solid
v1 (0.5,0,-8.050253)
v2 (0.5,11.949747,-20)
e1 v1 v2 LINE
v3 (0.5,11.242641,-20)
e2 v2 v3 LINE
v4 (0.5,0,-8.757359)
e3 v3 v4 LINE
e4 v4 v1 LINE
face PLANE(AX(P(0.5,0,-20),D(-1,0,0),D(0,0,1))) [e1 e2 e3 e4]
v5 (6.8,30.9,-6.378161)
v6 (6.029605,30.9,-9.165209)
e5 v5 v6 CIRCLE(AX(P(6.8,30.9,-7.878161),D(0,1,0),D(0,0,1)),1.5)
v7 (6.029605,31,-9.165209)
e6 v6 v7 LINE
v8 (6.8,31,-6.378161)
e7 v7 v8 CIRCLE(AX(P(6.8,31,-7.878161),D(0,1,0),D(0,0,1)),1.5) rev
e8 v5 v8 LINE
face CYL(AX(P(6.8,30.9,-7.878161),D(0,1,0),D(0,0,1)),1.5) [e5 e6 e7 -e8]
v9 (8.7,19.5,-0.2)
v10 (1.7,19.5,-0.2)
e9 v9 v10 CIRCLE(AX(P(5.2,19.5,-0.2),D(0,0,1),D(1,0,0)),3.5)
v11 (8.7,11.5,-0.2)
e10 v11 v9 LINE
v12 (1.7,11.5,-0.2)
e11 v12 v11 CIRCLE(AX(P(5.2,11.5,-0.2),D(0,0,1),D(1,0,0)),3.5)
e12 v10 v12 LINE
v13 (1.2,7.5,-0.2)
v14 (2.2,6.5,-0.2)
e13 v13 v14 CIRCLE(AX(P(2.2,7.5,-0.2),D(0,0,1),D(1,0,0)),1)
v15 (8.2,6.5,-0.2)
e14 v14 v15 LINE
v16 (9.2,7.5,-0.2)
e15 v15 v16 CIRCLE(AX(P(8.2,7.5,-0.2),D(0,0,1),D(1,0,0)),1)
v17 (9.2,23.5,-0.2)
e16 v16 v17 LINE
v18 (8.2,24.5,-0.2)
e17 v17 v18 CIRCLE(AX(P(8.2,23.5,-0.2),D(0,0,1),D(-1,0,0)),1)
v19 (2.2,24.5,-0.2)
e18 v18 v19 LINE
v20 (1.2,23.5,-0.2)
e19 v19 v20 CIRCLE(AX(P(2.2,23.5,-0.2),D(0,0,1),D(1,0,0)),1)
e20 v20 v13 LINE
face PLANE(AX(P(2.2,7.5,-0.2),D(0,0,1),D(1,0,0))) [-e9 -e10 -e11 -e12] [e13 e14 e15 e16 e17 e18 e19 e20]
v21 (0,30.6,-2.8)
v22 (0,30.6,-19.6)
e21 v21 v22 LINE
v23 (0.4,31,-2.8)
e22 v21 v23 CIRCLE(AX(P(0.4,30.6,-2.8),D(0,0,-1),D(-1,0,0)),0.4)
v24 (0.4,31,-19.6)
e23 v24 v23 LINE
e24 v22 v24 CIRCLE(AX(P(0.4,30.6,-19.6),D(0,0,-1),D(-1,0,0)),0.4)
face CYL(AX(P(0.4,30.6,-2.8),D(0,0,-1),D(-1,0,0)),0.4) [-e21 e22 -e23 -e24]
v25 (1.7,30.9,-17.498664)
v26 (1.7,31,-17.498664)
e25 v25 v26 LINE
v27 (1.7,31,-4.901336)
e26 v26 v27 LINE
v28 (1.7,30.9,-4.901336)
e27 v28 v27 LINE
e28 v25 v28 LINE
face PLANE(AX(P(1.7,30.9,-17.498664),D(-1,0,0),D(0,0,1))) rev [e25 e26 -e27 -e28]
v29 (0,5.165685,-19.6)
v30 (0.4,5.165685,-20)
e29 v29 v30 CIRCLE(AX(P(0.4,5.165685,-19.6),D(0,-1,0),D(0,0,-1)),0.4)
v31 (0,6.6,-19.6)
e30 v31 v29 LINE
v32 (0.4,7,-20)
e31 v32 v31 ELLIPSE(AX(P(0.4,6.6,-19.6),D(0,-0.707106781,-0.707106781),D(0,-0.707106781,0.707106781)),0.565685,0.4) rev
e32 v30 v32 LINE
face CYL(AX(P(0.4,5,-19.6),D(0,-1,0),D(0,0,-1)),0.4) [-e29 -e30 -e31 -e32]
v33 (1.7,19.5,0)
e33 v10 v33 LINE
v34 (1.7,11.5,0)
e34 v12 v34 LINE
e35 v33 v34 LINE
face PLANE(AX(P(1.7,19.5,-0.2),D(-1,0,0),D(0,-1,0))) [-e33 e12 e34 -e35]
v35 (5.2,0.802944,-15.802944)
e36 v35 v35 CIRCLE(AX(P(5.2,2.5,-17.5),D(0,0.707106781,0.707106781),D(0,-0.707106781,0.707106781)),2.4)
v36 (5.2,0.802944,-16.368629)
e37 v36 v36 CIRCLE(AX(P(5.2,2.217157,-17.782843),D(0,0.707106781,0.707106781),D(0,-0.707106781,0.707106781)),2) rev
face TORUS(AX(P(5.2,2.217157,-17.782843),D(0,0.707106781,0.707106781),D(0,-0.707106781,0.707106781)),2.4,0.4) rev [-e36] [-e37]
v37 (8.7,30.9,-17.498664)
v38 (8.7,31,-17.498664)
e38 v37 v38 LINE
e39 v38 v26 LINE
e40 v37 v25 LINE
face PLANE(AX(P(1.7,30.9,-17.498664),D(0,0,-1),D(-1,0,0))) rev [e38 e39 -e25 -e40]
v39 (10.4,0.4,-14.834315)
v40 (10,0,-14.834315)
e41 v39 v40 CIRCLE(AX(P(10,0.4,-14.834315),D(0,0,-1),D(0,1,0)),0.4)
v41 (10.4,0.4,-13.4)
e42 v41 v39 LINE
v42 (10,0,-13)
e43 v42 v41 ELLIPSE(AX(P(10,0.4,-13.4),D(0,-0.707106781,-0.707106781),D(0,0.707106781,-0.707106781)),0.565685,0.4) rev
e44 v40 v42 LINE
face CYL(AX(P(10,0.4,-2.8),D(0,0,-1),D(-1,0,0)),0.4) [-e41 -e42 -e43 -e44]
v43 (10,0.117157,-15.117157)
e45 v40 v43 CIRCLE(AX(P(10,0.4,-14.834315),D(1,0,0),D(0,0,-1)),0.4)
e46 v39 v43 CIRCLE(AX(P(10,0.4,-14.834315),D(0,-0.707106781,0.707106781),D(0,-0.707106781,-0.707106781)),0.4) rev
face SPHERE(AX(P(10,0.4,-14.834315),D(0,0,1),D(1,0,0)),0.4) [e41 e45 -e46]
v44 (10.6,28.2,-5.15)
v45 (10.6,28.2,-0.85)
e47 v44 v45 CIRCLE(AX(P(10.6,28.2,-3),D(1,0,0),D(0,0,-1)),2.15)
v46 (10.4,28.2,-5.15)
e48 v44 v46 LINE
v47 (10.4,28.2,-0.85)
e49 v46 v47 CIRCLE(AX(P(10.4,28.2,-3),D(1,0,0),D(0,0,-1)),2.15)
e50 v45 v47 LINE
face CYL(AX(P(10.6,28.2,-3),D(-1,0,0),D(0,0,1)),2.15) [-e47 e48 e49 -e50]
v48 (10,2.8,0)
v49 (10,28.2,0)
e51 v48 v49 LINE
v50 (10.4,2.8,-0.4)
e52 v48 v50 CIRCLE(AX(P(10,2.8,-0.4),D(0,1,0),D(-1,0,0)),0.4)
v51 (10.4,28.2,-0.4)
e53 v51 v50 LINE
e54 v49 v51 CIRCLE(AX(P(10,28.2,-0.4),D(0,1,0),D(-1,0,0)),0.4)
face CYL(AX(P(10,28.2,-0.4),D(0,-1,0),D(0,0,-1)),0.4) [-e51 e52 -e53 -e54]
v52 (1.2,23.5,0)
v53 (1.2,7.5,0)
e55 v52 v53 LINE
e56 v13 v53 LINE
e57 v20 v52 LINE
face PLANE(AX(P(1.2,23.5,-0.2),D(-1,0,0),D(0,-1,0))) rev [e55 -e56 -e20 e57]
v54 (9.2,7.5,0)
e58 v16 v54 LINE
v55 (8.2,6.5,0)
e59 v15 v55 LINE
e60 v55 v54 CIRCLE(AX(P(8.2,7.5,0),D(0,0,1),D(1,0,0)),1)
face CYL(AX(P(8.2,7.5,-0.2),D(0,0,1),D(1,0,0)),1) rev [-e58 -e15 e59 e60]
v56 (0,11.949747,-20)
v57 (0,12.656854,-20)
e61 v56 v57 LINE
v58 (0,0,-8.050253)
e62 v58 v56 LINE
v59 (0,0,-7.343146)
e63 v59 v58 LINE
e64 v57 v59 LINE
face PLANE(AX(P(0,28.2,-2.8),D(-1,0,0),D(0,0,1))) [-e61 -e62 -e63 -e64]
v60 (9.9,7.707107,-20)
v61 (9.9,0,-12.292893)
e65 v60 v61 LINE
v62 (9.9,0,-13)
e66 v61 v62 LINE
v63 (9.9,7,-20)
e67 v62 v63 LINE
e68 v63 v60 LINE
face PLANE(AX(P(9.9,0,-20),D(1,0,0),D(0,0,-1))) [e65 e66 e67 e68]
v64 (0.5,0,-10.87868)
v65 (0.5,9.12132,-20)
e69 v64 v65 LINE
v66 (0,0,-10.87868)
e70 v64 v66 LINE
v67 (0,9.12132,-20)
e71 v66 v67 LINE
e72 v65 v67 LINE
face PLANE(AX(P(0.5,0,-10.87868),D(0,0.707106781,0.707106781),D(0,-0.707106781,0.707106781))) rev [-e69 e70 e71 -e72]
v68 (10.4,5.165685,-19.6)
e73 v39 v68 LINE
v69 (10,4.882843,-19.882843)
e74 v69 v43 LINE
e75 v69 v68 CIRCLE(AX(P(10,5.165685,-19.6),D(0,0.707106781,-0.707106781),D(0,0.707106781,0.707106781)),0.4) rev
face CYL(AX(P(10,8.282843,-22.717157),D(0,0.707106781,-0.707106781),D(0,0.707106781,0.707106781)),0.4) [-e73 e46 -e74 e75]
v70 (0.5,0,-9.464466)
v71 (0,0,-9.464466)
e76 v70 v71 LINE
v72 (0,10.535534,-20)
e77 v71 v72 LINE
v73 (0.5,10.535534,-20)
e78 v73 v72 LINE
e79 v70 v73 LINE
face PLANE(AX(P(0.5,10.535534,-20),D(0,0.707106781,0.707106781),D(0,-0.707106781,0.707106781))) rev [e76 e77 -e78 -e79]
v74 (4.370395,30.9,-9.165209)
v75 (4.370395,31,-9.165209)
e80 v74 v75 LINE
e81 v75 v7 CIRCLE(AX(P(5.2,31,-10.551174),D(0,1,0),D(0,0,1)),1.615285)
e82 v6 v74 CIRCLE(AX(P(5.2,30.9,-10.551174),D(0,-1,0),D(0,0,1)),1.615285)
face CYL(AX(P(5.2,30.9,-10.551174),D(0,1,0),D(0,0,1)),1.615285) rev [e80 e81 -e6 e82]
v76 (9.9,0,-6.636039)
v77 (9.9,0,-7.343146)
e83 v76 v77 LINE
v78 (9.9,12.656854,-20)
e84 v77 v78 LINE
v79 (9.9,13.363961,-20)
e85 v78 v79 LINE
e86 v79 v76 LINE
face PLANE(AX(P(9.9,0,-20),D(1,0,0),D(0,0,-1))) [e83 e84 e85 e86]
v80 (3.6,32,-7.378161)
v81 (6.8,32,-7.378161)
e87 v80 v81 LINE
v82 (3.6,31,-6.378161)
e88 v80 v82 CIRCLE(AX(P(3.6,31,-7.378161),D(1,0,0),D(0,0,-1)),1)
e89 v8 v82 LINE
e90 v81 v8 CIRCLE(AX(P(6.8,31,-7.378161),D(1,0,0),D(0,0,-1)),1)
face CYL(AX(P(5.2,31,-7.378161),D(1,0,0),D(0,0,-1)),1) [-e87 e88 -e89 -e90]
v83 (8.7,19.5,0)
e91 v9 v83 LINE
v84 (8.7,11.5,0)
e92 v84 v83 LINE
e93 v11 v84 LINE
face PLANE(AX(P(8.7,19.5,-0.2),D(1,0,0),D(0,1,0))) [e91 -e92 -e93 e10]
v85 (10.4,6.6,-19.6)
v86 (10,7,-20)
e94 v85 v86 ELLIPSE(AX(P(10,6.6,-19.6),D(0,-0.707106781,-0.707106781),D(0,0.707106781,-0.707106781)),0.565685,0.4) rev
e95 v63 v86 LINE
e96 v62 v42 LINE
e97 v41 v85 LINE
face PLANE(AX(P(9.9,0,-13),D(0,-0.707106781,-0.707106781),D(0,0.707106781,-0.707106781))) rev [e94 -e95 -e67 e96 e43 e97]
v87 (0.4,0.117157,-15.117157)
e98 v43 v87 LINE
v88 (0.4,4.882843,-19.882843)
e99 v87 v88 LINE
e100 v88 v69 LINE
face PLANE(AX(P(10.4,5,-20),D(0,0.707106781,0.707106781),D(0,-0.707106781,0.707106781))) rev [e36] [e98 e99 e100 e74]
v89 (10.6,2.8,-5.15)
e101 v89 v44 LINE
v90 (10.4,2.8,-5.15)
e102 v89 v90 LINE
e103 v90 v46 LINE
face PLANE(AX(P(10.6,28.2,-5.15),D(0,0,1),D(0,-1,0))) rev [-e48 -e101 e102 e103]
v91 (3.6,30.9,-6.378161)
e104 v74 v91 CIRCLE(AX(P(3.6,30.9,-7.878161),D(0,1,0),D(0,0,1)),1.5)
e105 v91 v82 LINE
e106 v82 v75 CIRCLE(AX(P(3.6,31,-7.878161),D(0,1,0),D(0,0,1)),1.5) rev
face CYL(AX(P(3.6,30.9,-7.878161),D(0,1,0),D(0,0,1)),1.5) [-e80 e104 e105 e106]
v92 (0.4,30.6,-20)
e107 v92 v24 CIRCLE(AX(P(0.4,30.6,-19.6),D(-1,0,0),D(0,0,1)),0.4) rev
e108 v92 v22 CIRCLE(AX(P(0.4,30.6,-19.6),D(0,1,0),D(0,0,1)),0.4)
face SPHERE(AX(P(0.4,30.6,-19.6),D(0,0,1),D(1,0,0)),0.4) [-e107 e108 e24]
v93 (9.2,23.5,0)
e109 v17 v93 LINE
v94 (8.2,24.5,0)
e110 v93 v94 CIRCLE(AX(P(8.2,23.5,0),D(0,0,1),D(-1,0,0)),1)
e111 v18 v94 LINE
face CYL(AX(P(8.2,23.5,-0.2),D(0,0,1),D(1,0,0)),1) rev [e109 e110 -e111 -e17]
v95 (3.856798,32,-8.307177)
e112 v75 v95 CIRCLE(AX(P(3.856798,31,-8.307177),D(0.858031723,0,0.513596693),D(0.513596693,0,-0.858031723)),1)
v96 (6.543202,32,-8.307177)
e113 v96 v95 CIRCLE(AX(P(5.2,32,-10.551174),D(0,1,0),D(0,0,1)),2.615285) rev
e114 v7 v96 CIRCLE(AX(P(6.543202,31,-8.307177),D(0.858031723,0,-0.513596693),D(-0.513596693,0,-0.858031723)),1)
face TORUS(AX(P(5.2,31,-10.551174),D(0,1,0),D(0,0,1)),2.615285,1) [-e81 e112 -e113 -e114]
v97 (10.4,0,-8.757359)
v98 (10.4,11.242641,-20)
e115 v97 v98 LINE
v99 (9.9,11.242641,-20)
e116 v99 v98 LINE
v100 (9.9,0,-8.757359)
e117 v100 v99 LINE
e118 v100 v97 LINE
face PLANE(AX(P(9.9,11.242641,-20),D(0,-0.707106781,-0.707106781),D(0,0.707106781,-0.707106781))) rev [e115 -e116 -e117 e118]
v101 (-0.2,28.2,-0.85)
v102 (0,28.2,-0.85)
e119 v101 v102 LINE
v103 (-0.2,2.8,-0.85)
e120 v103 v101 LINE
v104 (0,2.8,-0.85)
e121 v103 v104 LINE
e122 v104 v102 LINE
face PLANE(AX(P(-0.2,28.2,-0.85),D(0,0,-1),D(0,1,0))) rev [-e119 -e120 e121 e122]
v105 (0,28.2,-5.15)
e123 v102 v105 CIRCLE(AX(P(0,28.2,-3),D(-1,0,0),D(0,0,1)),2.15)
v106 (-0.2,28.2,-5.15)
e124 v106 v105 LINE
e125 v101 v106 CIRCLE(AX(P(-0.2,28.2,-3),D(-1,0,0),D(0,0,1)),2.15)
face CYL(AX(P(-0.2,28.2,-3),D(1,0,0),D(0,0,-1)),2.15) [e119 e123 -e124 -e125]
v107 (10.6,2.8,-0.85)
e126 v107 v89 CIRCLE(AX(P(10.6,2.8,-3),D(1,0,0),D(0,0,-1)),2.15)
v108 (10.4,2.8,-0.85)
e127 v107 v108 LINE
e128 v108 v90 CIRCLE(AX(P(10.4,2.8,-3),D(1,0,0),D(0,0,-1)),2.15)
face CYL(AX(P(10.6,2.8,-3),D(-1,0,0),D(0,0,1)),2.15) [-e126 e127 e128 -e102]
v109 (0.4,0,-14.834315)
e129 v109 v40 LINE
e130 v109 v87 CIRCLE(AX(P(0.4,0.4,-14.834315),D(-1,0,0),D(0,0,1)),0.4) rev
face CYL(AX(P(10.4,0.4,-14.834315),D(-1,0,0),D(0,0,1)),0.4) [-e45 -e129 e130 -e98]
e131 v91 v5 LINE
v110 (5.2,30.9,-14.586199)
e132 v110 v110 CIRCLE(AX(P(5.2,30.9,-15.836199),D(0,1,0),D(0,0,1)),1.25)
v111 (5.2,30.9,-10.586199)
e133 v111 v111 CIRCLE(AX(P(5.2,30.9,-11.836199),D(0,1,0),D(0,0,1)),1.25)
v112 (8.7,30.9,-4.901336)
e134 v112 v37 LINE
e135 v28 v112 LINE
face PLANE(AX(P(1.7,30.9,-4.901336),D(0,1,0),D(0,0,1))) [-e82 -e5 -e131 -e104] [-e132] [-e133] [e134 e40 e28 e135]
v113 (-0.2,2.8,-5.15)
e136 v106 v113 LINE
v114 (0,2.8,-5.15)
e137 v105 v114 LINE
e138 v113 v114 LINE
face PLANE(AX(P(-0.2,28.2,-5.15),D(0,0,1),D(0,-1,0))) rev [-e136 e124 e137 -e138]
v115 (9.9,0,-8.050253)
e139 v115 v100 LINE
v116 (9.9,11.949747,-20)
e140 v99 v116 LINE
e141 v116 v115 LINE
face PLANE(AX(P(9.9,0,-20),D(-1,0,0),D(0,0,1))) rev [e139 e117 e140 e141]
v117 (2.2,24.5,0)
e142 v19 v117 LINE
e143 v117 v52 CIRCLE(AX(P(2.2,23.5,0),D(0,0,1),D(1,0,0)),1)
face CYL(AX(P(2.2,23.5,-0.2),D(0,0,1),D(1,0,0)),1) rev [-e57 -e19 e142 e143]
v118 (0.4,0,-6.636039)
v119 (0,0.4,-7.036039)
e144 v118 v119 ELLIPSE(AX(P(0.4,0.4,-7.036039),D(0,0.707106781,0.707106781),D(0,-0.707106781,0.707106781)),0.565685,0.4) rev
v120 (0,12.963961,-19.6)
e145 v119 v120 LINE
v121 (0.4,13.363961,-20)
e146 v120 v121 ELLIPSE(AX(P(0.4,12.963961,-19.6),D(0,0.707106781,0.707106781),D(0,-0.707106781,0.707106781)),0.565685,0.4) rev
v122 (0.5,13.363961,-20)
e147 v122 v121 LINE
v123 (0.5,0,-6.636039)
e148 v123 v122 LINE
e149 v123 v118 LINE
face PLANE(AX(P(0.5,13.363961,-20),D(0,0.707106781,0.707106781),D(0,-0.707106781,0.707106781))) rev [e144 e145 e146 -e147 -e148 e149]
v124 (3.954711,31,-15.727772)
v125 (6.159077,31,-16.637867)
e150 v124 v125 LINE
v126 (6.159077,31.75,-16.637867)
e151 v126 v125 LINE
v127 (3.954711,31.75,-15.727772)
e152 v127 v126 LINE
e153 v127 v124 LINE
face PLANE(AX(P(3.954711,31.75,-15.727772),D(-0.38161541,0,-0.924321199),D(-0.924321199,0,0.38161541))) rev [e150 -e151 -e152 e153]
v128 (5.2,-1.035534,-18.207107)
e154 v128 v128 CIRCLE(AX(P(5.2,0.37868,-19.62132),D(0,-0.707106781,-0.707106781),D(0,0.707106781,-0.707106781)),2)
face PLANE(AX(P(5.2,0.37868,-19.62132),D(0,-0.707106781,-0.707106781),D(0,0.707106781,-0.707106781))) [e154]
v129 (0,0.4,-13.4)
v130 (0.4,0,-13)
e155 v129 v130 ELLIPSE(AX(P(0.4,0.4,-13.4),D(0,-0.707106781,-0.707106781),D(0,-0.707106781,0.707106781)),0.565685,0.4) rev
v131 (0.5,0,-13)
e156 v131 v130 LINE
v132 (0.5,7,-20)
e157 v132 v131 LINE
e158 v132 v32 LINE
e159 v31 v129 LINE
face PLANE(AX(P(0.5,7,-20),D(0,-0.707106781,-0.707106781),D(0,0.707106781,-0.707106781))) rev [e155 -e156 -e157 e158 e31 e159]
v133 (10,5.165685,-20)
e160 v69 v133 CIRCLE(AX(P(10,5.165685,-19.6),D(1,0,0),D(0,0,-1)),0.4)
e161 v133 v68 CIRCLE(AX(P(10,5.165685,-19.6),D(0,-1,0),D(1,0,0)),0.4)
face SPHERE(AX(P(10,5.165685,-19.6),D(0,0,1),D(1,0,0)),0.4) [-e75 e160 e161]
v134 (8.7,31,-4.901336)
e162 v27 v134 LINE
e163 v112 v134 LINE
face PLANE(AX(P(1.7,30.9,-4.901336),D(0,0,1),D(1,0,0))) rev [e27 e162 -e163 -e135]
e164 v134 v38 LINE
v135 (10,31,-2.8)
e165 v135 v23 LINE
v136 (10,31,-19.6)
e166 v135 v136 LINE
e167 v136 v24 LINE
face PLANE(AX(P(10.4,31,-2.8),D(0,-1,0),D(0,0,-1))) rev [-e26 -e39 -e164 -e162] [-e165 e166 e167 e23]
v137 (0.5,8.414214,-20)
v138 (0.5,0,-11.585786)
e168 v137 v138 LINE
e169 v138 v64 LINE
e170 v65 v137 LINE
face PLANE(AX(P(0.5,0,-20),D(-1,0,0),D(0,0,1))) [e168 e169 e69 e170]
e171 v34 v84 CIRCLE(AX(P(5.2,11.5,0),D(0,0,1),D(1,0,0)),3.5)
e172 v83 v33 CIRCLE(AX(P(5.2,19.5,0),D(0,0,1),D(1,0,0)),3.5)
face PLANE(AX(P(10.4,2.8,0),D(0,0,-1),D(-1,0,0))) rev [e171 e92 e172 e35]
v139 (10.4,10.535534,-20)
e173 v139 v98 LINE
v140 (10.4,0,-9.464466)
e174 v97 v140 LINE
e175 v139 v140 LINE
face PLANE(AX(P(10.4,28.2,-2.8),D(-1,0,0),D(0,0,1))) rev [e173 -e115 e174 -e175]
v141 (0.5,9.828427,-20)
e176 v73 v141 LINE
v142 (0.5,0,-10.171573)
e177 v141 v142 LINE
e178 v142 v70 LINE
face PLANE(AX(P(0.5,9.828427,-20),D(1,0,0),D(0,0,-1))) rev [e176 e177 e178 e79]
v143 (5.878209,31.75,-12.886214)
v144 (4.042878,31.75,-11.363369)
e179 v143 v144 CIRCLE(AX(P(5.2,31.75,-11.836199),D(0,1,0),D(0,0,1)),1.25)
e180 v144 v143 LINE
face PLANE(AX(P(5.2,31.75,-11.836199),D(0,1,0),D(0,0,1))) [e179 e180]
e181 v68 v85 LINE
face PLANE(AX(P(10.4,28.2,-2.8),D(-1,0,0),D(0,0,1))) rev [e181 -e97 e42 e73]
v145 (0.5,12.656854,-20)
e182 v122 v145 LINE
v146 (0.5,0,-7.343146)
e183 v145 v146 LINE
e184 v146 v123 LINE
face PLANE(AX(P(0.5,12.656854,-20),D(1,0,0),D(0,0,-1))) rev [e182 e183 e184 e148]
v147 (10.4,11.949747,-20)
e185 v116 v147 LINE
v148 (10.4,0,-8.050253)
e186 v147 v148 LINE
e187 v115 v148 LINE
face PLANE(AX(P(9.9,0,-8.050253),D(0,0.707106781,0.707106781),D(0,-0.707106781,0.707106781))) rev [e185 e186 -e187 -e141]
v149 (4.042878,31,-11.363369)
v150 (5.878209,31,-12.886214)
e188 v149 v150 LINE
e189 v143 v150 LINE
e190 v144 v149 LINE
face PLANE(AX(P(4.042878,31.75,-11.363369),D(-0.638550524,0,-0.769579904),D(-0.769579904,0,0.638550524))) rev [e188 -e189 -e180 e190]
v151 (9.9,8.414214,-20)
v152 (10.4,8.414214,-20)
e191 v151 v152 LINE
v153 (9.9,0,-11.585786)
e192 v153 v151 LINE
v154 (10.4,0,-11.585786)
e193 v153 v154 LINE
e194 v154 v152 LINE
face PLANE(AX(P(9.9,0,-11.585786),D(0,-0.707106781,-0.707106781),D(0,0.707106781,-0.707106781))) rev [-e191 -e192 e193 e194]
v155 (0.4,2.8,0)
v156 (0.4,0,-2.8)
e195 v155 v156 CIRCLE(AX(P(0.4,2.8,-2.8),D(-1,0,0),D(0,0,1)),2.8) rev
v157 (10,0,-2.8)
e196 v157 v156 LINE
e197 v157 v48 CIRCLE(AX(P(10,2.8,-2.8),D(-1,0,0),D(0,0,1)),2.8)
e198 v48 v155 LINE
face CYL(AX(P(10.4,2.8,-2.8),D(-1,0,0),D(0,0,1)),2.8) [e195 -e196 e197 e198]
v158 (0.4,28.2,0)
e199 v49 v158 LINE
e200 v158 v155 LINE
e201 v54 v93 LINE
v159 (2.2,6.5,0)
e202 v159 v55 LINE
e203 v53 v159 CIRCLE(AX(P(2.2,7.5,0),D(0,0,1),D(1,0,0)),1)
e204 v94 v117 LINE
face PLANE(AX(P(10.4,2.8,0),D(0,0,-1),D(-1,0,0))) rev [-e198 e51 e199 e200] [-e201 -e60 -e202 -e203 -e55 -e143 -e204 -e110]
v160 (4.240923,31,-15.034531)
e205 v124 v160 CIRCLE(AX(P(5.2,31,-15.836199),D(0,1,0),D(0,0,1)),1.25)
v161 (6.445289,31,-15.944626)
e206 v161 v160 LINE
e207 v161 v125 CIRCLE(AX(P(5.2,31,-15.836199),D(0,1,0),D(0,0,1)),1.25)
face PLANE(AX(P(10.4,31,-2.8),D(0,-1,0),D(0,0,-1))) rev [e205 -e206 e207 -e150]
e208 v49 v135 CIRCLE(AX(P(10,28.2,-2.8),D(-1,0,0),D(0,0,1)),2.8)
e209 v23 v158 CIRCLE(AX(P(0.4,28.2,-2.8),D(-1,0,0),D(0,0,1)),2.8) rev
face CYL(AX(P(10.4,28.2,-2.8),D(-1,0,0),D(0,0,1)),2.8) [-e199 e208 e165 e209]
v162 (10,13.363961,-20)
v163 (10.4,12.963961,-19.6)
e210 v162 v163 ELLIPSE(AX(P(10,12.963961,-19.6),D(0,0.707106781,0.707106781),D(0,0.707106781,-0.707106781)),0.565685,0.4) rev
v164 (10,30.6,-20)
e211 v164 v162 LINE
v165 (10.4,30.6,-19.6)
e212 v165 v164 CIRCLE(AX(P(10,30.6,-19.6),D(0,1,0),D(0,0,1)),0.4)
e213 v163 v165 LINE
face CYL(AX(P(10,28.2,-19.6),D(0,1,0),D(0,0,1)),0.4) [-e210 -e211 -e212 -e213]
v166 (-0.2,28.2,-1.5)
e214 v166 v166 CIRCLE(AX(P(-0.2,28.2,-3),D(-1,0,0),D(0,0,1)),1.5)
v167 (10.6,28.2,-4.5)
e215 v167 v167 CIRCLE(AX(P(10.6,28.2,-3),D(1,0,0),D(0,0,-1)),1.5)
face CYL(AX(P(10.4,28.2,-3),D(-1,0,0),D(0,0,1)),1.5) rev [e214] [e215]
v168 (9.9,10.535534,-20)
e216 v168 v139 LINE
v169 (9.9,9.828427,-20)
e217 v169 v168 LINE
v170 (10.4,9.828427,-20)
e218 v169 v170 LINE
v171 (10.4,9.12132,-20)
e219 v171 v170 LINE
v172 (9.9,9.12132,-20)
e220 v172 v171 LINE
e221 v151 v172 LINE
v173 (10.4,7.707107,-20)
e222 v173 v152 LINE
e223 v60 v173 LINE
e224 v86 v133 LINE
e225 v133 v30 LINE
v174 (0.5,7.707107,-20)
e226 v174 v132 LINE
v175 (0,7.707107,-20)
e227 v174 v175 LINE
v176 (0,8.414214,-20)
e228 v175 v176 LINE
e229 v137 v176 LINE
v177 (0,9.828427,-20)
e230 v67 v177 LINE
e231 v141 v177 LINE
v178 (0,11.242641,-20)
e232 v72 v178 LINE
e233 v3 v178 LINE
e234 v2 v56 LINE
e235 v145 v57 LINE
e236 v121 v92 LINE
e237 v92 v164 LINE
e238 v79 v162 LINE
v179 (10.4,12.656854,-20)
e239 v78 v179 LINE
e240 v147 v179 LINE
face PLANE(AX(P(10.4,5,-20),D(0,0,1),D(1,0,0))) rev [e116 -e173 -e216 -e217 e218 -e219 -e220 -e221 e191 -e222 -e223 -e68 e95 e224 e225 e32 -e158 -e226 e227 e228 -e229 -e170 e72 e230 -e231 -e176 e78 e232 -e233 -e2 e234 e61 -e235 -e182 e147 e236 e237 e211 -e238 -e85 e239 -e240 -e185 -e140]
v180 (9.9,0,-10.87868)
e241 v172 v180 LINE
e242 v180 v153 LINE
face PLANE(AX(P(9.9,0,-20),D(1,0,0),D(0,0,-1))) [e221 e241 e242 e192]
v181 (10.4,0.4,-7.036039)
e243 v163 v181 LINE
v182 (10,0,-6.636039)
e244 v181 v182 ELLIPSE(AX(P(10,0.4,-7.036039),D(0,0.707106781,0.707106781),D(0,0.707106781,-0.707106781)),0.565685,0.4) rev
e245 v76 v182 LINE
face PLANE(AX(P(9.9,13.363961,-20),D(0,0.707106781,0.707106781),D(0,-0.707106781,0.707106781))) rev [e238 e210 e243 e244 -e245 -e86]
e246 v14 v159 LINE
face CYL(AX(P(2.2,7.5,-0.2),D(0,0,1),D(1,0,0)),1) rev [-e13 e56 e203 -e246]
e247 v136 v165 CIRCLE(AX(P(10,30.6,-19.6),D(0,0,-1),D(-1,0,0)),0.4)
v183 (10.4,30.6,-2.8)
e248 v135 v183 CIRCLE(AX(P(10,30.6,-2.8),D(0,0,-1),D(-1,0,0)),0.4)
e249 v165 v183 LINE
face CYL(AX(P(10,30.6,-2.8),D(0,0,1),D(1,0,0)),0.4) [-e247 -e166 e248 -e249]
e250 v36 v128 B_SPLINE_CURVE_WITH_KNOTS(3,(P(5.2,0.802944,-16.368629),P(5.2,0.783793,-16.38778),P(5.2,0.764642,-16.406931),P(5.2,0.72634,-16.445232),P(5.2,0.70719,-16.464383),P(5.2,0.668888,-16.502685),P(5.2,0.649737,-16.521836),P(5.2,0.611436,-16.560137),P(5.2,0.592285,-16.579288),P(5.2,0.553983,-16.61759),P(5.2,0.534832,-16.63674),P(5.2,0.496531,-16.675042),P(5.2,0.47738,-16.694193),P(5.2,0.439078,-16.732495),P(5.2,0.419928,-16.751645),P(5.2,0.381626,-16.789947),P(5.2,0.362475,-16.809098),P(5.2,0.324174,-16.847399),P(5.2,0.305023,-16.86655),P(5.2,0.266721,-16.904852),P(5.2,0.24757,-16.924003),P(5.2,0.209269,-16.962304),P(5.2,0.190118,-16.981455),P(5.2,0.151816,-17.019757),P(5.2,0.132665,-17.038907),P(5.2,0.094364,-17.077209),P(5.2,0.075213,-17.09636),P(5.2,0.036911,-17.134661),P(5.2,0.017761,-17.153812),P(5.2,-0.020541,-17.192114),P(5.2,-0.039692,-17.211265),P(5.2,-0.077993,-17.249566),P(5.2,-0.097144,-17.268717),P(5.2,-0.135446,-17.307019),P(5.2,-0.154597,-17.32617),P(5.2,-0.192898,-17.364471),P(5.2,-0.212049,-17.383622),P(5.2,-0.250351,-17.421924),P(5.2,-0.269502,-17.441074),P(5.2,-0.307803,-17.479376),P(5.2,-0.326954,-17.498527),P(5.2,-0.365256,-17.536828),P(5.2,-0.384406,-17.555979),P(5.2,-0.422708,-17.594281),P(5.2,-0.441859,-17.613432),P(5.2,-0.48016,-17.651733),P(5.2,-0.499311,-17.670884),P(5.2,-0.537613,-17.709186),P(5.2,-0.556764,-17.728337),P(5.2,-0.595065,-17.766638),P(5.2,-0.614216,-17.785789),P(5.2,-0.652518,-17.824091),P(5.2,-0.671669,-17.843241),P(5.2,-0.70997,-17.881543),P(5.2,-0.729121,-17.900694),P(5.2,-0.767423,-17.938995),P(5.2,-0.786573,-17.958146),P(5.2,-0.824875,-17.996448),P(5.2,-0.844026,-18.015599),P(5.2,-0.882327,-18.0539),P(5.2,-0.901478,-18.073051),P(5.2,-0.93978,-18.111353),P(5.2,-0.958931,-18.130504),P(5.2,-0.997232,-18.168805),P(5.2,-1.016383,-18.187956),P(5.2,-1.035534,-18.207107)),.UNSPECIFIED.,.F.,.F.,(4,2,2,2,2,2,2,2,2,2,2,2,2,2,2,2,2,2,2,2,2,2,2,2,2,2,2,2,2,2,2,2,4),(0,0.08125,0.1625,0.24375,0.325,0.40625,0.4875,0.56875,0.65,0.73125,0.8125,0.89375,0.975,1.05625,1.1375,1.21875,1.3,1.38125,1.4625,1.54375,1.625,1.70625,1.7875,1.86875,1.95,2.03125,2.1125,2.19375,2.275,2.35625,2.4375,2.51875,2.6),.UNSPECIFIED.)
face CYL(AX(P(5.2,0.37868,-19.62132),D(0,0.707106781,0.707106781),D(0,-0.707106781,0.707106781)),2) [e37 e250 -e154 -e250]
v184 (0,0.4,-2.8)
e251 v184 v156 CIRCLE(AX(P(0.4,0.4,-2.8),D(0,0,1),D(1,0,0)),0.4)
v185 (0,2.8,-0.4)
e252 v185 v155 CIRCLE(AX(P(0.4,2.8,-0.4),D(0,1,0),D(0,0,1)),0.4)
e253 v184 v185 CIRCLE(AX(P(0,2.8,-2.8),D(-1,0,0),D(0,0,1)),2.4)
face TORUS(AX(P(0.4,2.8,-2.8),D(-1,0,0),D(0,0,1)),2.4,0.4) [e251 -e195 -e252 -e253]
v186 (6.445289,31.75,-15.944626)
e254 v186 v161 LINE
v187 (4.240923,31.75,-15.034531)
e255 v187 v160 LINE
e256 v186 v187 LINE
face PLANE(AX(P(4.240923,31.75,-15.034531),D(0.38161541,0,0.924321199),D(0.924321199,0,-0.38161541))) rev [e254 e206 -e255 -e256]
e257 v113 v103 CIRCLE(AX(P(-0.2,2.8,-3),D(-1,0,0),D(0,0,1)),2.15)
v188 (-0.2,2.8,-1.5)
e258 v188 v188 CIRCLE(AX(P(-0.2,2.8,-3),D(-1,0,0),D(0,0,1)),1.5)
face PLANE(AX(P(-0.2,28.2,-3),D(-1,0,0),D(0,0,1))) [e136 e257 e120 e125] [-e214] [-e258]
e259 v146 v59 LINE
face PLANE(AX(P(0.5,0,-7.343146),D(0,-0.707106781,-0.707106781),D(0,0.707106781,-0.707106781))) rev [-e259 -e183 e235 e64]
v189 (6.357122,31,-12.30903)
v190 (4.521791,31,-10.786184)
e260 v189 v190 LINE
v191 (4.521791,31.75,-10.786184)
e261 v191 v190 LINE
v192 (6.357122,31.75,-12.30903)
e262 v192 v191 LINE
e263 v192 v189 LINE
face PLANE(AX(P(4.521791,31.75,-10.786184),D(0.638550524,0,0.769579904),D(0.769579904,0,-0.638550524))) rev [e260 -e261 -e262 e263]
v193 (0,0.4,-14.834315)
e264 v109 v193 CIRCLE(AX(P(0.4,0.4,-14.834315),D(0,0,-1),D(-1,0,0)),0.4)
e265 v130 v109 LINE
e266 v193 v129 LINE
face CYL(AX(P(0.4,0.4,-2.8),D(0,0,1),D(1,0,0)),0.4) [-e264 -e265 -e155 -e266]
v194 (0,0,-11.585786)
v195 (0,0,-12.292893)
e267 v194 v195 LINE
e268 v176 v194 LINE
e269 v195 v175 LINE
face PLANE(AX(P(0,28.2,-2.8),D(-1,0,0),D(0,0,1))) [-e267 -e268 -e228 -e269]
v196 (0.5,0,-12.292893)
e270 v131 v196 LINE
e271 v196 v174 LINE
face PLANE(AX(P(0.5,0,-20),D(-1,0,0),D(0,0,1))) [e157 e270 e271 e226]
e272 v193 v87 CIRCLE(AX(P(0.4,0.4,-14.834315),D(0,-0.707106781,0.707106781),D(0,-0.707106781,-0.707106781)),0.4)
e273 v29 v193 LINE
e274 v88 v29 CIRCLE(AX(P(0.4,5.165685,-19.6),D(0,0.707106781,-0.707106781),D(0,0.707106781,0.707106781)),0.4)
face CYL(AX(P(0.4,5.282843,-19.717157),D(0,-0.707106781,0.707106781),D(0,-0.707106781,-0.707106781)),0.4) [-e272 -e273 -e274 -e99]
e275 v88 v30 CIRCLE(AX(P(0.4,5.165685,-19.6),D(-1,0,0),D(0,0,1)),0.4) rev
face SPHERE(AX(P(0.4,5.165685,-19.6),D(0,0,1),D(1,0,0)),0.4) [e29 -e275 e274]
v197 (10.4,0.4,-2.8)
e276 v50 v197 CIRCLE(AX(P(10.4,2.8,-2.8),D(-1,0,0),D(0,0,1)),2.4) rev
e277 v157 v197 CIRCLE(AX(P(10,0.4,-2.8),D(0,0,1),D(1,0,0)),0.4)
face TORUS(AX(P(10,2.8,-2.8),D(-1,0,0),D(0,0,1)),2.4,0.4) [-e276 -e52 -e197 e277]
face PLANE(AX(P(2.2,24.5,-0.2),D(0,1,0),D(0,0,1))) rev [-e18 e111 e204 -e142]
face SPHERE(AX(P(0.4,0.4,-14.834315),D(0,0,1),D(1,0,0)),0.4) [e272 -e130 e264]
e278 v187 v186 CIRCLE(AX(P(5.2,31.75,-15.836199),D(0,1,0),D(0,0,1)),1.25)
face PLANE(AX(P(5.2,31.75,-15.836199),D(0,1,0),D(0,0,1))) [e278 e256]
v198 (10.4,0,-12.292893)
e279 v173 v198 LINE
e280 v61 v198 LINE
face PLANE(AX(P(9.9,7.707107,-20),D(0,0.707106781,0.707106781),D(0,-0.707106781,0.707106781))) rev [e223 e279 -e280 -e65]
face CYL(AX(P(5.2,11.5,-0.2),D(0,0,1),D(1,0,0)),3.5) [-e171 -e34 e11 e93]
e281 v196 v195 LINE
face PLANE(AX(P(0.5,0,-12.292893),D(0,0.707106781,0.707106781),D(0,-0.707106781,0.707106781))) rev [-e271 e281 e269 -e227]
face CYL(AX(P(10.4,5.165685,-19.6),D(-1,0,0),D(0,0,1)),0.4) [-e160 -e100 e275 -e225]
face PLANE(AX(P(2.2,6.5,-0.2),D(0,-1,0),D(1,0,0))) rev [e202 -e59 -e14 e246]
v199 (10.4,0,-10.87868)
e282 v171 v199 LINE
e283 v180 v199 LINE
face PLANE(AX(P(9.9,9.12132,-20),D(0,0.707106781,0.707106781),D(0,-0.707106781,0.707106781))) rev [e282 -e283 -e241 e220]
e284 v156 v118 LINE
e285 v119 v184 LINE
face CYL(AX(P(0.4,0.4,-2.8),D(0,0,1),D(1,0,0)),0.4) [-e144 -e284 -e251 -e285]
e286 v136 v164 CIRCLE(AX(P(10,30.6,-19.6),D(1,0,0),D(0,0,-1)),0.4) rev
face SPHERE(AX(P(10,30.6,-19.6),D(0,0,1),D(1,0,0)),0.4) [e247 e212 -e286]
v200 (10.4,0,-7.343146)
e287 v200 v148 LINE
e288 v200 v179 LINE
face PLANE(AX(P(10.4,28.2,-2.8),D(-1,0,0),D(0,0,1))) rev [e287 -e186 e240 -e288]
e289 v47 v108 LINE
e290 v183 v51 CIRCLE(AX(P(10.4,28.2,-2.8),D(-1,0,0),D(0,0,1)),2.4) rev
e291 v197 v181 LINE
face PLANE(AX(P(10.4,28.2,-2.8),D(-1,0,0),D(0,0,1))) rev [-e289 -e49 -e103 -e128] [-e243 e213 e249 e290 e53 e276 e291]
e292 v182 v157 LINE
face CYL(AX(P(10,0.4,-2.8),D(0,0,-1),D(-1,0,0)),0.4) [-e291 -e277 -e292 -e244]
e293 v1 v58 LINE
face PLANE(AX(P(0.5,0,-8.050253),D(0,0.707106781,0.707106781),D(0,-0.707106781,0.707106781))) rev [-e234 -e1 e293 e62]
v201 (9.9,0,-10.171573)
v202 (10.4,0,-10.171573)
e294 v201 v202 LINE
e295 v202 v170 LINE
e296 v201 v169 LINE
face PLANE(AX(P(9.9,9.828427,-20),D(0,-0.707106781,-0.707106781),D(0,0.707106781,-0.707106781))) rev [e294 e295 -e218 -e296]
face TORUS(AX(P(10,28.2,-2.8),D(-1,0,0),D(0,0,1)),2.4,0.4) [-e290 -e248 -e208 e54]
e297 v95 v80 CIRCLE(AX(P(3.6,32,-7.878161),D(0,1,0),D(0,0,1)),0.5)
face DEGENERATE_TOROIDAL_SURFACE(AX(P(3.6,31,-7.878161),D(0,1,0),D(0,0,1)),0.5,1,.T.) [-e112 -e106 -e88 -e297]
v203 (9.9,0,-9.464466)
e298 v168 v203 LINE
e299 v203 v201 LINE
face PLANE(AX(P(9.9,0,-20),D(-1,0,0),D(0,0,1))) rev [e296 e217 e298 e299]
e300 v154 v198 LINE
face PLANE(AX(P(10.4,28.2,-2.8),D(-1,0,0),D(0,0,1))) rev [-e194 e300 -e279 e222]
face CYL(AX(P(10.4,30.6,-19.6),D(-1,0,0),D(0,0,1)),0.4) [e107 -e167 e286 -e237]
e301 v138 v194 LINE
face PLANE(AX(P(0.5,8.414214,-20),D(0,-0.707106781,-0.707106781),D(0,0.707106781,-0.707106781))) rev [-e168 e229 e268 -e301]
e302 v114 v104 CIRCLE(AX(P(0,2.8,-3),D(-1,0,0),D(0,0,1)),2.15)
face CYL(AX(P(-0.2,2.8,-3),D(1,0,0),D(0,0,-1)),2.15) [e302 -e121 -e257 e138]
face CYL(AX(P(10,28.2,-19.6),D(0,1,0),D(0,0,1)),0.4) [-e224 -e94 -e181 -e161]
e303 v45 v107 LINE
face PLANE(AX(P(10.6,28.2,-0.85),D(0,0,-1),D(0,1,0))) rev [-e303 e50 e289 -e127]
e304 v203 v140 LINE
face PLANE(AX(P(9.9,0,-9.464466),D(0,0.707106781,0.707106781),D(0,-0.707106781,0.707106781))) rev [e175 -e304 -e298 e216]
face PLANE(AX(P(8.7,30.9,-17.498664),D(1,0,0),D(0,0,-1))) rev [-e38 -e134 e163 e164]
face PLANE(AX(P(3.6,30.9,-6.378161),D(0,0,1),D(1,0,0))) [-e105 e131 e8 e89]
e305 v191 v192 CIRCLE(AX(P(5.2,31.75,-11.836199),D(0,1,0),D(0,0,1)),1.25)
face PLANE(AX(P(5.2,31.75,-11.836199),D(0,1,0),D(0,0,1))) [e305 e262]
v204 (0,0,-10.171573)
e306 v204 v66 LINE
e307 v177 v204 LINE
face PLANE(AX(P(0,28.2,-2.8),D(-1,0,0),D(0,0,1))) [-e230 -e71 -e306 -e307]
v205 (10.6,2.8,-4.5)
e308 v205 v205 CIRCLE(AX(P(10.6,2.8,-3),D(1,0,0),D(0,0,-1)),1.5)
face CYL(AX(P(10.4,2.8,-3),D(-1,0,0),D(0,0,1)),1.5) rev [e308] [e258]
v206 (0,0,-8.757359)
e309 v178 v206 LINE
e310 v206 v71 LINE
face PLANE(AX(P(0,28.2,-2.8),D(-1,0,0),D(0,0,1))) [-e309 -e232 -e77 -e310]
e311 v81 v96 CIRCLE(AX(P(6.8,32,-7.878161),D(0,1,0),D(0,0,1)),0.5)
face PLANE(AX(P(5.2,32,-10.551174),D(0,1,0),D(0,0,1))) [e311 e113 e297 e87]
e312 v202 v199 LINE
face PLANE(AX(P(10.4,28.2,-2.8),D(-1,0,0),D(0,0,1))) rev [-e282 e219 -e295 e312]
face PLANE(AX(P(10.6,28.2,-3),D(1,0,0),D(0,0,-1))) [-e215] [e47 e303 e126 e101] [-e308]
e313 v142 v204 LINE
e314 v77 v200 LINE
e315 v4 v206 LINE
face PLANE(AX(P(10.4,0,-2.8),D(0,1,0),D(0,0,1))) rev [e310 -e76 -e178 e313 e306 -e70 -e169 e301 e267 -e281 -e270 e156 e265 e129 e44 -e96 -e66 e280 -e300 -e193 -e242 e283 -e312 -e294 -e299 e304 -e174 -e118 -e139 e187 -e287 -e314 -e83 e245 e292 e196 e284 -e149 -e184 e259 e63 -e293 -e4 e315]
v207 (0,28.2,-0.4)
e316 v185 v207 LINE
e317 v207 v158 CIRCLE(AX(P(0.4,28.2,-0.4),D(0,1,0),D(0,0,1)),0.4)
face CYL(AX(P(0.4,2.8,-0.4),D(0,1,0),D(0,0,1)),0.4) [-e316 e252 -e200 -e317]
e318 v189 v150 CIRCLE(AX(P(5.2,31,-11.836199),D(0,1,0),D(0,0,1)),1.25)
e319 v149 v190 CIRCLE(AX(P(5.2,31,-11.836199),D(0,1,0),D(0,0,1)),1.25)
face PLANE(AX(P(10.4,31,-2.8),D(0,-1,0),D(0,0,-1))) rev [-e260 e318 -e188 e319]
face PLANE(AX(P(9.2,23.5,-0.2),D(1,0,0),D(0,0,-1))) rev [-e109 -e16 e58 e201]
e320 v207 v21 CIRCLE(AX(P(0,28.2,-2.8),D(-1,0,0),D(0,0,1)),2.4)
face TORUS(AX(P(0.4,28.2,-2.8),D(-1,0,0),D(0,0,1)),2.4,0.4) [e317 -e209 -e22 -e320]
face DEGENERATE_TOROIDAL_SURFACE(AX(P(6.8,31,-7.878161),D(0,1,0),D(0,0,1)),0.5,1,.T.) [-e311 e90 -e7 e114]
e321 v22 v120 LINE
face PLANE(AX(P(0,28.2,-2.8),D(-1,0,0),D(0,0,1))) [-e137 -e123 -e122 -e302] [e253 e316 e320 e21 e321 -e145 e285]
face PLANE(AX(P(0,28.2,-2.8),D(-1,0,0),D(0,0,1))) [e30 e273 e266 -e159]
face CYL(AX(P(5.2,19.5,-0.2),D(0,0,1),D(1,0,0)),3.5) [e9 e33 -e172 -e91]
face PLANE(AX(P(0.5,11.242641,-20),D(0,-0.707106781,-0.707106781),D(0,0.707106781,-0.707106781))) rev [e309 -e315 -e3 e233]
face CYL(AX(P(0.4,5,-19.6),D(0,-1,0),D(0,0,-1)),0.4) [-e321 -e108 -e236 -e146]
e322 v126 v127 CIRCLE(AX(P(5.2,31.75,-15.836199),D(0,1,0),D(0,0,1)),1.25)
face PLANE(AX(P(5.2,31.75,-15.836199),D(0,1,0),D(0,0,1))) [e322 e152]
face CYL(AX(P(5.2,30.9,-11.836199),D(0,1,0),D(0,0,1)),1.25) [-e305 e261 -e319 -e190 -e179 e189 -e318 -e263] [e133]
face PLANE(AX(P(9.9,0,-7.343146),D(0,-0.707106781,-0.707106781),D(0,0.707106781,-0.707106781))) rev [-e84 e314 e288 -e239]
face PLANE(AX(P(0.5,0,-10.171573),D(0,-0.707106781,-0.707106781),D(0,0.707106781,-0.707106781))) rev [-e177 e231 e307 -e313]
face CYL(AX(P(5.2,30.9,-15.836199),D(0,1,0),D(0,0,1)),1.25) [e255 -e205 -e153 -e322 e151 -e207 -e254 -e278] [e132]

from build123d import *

# Parameters (mm, degrees)
ESQUISSE1_R             = 1.5
BOSS_EXTRU_1_DEPTH      = 10.4
ESQUISSE2_R             = 1.5
BOSS_EXTRU_3_DEPTH      = 0.2
BOSS_EXTRU_4_START      = 0.2
ESQUISSE3_R             = 1.5
BOSS_EXTRU_4_DEPTH      = 0.2
ENL_V_MAT_EXTRU_1_DEPTH = 0.2
ENL_V_MAT_EXTRU_3_DEPTH = 0.5
ENL_V_MAT_EXTRU_4_DEPTH = 0.5
CONG_1_R                = 0.4
ESQUISSE8_R             = 2
BOSS_EXTRU_5_DEPTH      = 3
CONG_2_R                = 0.4
ESQUISSE9_W             = 7
ESQUISSE9_H             = 12.59732845
ESQUISSE9_R             = 1.25
ENL_V_MAT_EXTRU_5_DEPTH = 0.1
BOSS_EXTRU_6_START      = 0.75
BOSS_EXTRU_6_DEPTH      = 0.75
BOSS_EXTRU_7_START      = 1
BOSS_EXTRU_7_DEPTH      = 1
CONG_3_R                = 1


with BuildPart() as part:
    # Esquisse1 → Boss.-Extru.1 (new body)
    with BuildSketch(Plane(origin=(0, 0, 0), x_dir=(0, 0, -1), z_dir=(1, 0, 0))):
        with BuildLine():
            Line((2.8, 0), (15, 0))
            Line((15, 0), (20, 5))
            Line((20, 5), (20, 31))
            Line((20, 31), (2.8, 31))
            ThreePointArc((2.8, 31), (0.820101013, 30.179898987), (0, 28.2))
            Line((0, 28.2), (0, 2.8))
            ThreePointArc((0, 2.8), (0.820101013, 0.820101013), (2.8, 0))
        make_face()
        with Locations((3, 28.2)):
            Circle(ESQUISSE1_R, mode=Mode.SUBTRACT)
        with Locations((3, 2.8)):
            Circle(ESQUISSE1_R, mode=Mode.SUBTRACT)
    extrude(amount=BOSS_EXTRU_1_DEPTH)

    # Esquisse2 → Boss.-Extru.3 (add)
    with BuildSketch(Plane(origin=(10.4, 0, 0), x_dir=(0, 0, -1), z_dir=(1, 0, 0))):
        with BuildLine():
            Line((5.15, 28.2), (5.15, 2.8))
            ThreePointArc((5.15, 2.8), (3, 0.65), (0.85, 2.8))
            Line((0.85, 2.8), (0.85, 28.2))
            ThreePointArc((0.85, 28.2), (3, 30.35), (5.15, 28.2))
        make_face()
        with Locations((3, 28.2)):
            Circle(ESQUISSE2_R, mode=Mode.SUBTRACT)
        with Locations((3, 2.8)):
            Circle(ESQUISSE2_R, mode=Mode.SUBTRACT)
    extrude(amount=BOSS_EXTRU_3_DEPTH)

    # Esquisse3 → Boss.-Extru.4 (add)
    with BuildSketch(Plane.ZY.offset(BOSS_EXTRU_4_START)):
        with BuildLine():
            Line((-0.85, 28.2), (-0.85, 2.8))
            ThreePointArc((-0.85, 2.8), (-3, 0.65), (-5.15, 2.8))
            Line((-5.15, 2.8), (-5.15, 28.2))
            ThreePointArc((-5.15, 28.2), (-3, 30.35), (-0.85, 28.2))
        make_face()
        with Locations((-3, 2.8)):
            Circle(ESQUISSE3_R, mode=Mode.SUBTRACT)
        with Locations((-3, 28.2)):
            Circle(ESQUISSE3_R, mode=Mode.SUBTRACT)
    extrude(amount=-BOSS_EXTRU_4_DEPTH)

    # Esquisse4 → Enlèv. mat.-Extru.1 (cut)
    with BuildSketch(Plane.XY):
        with BuildLine():
            Line((2.2, 24.5), (8.2, 24.5))
            ThreePointArc((8.2, 24.5), (8.907106781, 24.207106781), (9.2, 23.5))
            Line((9.2, 23.5), (9.2, 7.5))
            ThreePointArc((9.2, 7.5), (8.907106781, 6.792893219), (8.2, 6.5))
            Line((8.2, 6.5), (2.2, 6.5))
            ThreePointArc((2.2, 6.5), (1.492893219, 6.792893219), (1.2, 7.5))
            Line((1.2, 7.5), (1.2, 23.5))
            ThreePointArc((1.2, 23.5), (1.492893219, 24.207106781), (2.2, 24.5))
        make_face()
        with BuildLine():
            Line((8.7, 19.5), (8.7, 11.5))
            ThreePointArc((8.7, 11.5), (5.2, 8), (1.7, 11.5))
            Line((1.7, 11.5), (1.7, 19.5))
            ThreePointArc((1.7, 19.5), (5.2, 23), (8.7, 19.5))
        make_face(mode=Mode.SUBTRACT)
    extrude(amount=-ENL_V_MAT_EXTRU_1_DEPTH, mode=Mode.SUBTRACT)

    # Esquisse5 → Enlèv. mat.-Extru.3 (cut)
    with BuildSketch(Plane(origin=(10.4, 0, 0), x_dir=(0, 0, -1), z_dir=(1, 0, 0))):
        Polygon((13, 0), (20, 7), (20, 7.707106781), (12.292893219, 0), align=None)
        Polygon((11.585786438, 0), (20, 8.414213562), (20, 9.121320344), (10.878679656, 0), align=None)
        Polygon((20, 9.828427125), (10.171572875, 0), (9.464466094, 0), (20, 10.535533906), align=None)
        Polygon((20, 11.242640687), (8.757359313, 0), (8.050252532, 0), (20, 11.949747468), align=None)
        Polygon((7.343145751, 0), (20, 12.656854249), (20, 13.363961031), (6.636038969, 0), align=None)
    extrude(amount=-ENL_V_MAT_EXTRU_3_DEPTH, mode=Mode.SUBTRACT)

    # Esquisse7 → Enlèv. mat.-Extru.4 (cut)
    with BuildSketch(Plane.ZY):
        Polygon((-20, 7), (-13, 0), (-12.292893219, 0), (-20, 7.707106781), align=None)
        Polygon((-20, 8.414213562), (-11.585786438, 0), (-10.878679656, 0), (-20, 9.121320344), align=None)
        Polygon((-20, 9.828427125), (-20, 10.535533906), (-9.464466094, 0), (-10.171572875, 0), align=None)
        Polygon((-20, 11.242640687), (-8.757359313, 0), (-8.050252532, 0), (-20, 11.949747468), align=None)
        Polygon((-20, 12.656854249), (-20, 13.363961031), (-6.636038969, 0), (-7.343145751, 0), align=None)
    extrude(amount=-ENL_V_MAT_EXTRU_4_DEPTH, mode=Mode.SUBTRACT)

    # Congé1
    cong_1_edges = [part.edges().sort_by_distance(p)[0] for p in [
        (10.4, 30.179898987, -0.820101013),
        (5.2, 5, -20),
        (5.2, 0, -15),
        (5.2, 31, -20),
        (10.4, 15.5, 0),
        (10.4, 22.181980515, -20),
        (10.4, 0.820101013, -0.820101013),
        (0, 0, -14),
        (10.4, 0, -4.718019485),
        (10.4, 2.5, -17.5),
        (0, 22.181980515, -20),
        (10.4, 6, -20),
        (0, 2.5, -17.5),
        (10.4, 31, -11.4),
        (0, 0, -4.718019485),
        (0, 0.820101013, -0.820101013),
        (0, 15.5, 0),
        (0, 30.179898987, -0.820101013),
        (0, 31, -11.4),
        (0, 6, -20),
        (10.4, 0, -14),
    ]]
    fillet(cong_1_edges, radius=CONG_1_R)

    # Esquisse8 → Boss.-Extru.5 (add)
    with BuildSketch(Plane(origin=(0, -7.5, -7.5), x_dir=(1, 0, 0), z_dir=(0, -0.7071067811865512, -0.7071067811865438))):
        with Locations(Location((5.2, -14.142135624, 0), (0, 0, 90))):
            Circle(ESQUISSE8_R)
    extrude(amount=BOSS_EXTRU_5_DEPTH)

    # Congé2
    cong_2_edges = [part.edges().sort_by_distance(p)[0] for p in [
        (5.2, 3.914213562, -18.914213562),
    ]]
    fillet(cong_2_edges, radius=CONG_2_R)

    # Esquisse9 → Enlèv. mat.-Extru.5 (cut)
    with BuildSketch(Plane(origin=(0, 31, 0), x_dir=(1, 0, 0), z_dir=(0, 1, 0))):
        with Locations((5.2, 11.2)):
            Rectangle(ESQUISSE9_W, ESQUISSE9_H)
        with Locations(Location((5.2, 15.836199023, 0), (0, 0, 270))):
            Circle(ESQUISSE9_R, mode=Mode.SUBTRACT)
        with Locations(Location((5.2, 11.836199023, 0), (0, 0, 270))):
            Circle(ESQUISSE9_R, mode=Mode.SUBTRACT)
        with BuildLine():
            Line((3.6, 6.378161231), (6.8, 6.378161231))
            ThreePointArc((6.8, 6.378161231), (8.245782033, 8.277803961), (6.029604961, 9.165208815))
            ThreePointArc((6.029604961, 9.165208815), (5.2, 8.935889606), (4.370395039, 9.165208815))
            ThreePointArc((4.370395039, 9.165208815), (2.154217967, 8.277803961), (3.6, 6.378161231))
        make_face(mode=Mode.SUBTRACT)
    extrude(amount=-ENL_V_MAT_EXTRU_5_DEPTH, mode=Mode.SUBTRACT)

    # Esquisse10 → Boss.-Extru.6 (add)
    with BuildSketch(Plane(origin=(0, 31, 0), x_dir=(1, 0, 0), z_dir=(0, 1, 0)).offset(BOSS_EXTRU_6_START)):
        with BuildLine():
            Line((3.954711438, 15.727772098), (6.159077004, 16.637866847))
            ThreePointArc((6.159077004, 16.637866847), (4.722980738, 16.991600522), (3.954711438, 15.727772098))
        make_face()
        with BuildLine():
            Line((4.240922996, 15.034531199), (6.445288562, 15.944625947))
            ThreePointArc((6.445288562, 15.944625947), (5.677019262, 14.680797524), (4.240922996, 15.034531199))
        make_face()
        with BuildLine():
            Line((4.042878005, 11.363368516), (5.878209102, 12.886214458))
            ThreePointArc((5.878209102, 12.886214458), (4.401811845, 12.798173903), (4.042878005, 11.363368516))
        make_face()
        with BuildLine():
            Line((4.521790898, 10.786183588), (6.357121995, 12.30902953))
            ThreePointArc((6.357121995, 12.30902953), (5.998188155, 10.874224143), (4.521790898, 10.786183588))
        make_face()
    extrude(amount=-BOSS_EXTRU_6_DEPTH)

    # Esquisse12 → Boss.-Extru.7 (add)
    with BuildSketch(Plane(origin=(0, 31, 0), x_dir=(1, 0, 0), z_dir=(0, 1, 0)).offset(BOSS_EXTRU_7_START)):
        with BuildLine():
            Line((3.6, 6.378161231), (6.8, 6.378161231))
            ThreePointArc((6.8, 6.378161231), (8.245782033, 8.277803961), (6.029604961, 9.165208815))
            ThreePointArc((6.029604961, 9.165208815), (5.2, 8.935889606), (4.370395039, 9.165208815))
            ThreePointArc((4.370395039, 9.165208815), (2.154217967, 8.277803961), (3.6, 6.378161231))
        make_face()
    extrude(amount=-BOSS_EXTRU_7_DEPTH)

    # Congé3
    cong_3_edges = [part.edges().sort_by_distance(p)[0] for p in [
        (5.2, 32, -8.935889606),
        (2.154217967, 32, -8.277803961),
        (5.2, 32, -6.378161231),
        (8.245782033, 32, -8.277803961),
    ]]
    fillet(cong_3_edges, radius=CONG_3_R - 0.0001)  # a hair under: the kernel refuses the full size


solid = part.part
